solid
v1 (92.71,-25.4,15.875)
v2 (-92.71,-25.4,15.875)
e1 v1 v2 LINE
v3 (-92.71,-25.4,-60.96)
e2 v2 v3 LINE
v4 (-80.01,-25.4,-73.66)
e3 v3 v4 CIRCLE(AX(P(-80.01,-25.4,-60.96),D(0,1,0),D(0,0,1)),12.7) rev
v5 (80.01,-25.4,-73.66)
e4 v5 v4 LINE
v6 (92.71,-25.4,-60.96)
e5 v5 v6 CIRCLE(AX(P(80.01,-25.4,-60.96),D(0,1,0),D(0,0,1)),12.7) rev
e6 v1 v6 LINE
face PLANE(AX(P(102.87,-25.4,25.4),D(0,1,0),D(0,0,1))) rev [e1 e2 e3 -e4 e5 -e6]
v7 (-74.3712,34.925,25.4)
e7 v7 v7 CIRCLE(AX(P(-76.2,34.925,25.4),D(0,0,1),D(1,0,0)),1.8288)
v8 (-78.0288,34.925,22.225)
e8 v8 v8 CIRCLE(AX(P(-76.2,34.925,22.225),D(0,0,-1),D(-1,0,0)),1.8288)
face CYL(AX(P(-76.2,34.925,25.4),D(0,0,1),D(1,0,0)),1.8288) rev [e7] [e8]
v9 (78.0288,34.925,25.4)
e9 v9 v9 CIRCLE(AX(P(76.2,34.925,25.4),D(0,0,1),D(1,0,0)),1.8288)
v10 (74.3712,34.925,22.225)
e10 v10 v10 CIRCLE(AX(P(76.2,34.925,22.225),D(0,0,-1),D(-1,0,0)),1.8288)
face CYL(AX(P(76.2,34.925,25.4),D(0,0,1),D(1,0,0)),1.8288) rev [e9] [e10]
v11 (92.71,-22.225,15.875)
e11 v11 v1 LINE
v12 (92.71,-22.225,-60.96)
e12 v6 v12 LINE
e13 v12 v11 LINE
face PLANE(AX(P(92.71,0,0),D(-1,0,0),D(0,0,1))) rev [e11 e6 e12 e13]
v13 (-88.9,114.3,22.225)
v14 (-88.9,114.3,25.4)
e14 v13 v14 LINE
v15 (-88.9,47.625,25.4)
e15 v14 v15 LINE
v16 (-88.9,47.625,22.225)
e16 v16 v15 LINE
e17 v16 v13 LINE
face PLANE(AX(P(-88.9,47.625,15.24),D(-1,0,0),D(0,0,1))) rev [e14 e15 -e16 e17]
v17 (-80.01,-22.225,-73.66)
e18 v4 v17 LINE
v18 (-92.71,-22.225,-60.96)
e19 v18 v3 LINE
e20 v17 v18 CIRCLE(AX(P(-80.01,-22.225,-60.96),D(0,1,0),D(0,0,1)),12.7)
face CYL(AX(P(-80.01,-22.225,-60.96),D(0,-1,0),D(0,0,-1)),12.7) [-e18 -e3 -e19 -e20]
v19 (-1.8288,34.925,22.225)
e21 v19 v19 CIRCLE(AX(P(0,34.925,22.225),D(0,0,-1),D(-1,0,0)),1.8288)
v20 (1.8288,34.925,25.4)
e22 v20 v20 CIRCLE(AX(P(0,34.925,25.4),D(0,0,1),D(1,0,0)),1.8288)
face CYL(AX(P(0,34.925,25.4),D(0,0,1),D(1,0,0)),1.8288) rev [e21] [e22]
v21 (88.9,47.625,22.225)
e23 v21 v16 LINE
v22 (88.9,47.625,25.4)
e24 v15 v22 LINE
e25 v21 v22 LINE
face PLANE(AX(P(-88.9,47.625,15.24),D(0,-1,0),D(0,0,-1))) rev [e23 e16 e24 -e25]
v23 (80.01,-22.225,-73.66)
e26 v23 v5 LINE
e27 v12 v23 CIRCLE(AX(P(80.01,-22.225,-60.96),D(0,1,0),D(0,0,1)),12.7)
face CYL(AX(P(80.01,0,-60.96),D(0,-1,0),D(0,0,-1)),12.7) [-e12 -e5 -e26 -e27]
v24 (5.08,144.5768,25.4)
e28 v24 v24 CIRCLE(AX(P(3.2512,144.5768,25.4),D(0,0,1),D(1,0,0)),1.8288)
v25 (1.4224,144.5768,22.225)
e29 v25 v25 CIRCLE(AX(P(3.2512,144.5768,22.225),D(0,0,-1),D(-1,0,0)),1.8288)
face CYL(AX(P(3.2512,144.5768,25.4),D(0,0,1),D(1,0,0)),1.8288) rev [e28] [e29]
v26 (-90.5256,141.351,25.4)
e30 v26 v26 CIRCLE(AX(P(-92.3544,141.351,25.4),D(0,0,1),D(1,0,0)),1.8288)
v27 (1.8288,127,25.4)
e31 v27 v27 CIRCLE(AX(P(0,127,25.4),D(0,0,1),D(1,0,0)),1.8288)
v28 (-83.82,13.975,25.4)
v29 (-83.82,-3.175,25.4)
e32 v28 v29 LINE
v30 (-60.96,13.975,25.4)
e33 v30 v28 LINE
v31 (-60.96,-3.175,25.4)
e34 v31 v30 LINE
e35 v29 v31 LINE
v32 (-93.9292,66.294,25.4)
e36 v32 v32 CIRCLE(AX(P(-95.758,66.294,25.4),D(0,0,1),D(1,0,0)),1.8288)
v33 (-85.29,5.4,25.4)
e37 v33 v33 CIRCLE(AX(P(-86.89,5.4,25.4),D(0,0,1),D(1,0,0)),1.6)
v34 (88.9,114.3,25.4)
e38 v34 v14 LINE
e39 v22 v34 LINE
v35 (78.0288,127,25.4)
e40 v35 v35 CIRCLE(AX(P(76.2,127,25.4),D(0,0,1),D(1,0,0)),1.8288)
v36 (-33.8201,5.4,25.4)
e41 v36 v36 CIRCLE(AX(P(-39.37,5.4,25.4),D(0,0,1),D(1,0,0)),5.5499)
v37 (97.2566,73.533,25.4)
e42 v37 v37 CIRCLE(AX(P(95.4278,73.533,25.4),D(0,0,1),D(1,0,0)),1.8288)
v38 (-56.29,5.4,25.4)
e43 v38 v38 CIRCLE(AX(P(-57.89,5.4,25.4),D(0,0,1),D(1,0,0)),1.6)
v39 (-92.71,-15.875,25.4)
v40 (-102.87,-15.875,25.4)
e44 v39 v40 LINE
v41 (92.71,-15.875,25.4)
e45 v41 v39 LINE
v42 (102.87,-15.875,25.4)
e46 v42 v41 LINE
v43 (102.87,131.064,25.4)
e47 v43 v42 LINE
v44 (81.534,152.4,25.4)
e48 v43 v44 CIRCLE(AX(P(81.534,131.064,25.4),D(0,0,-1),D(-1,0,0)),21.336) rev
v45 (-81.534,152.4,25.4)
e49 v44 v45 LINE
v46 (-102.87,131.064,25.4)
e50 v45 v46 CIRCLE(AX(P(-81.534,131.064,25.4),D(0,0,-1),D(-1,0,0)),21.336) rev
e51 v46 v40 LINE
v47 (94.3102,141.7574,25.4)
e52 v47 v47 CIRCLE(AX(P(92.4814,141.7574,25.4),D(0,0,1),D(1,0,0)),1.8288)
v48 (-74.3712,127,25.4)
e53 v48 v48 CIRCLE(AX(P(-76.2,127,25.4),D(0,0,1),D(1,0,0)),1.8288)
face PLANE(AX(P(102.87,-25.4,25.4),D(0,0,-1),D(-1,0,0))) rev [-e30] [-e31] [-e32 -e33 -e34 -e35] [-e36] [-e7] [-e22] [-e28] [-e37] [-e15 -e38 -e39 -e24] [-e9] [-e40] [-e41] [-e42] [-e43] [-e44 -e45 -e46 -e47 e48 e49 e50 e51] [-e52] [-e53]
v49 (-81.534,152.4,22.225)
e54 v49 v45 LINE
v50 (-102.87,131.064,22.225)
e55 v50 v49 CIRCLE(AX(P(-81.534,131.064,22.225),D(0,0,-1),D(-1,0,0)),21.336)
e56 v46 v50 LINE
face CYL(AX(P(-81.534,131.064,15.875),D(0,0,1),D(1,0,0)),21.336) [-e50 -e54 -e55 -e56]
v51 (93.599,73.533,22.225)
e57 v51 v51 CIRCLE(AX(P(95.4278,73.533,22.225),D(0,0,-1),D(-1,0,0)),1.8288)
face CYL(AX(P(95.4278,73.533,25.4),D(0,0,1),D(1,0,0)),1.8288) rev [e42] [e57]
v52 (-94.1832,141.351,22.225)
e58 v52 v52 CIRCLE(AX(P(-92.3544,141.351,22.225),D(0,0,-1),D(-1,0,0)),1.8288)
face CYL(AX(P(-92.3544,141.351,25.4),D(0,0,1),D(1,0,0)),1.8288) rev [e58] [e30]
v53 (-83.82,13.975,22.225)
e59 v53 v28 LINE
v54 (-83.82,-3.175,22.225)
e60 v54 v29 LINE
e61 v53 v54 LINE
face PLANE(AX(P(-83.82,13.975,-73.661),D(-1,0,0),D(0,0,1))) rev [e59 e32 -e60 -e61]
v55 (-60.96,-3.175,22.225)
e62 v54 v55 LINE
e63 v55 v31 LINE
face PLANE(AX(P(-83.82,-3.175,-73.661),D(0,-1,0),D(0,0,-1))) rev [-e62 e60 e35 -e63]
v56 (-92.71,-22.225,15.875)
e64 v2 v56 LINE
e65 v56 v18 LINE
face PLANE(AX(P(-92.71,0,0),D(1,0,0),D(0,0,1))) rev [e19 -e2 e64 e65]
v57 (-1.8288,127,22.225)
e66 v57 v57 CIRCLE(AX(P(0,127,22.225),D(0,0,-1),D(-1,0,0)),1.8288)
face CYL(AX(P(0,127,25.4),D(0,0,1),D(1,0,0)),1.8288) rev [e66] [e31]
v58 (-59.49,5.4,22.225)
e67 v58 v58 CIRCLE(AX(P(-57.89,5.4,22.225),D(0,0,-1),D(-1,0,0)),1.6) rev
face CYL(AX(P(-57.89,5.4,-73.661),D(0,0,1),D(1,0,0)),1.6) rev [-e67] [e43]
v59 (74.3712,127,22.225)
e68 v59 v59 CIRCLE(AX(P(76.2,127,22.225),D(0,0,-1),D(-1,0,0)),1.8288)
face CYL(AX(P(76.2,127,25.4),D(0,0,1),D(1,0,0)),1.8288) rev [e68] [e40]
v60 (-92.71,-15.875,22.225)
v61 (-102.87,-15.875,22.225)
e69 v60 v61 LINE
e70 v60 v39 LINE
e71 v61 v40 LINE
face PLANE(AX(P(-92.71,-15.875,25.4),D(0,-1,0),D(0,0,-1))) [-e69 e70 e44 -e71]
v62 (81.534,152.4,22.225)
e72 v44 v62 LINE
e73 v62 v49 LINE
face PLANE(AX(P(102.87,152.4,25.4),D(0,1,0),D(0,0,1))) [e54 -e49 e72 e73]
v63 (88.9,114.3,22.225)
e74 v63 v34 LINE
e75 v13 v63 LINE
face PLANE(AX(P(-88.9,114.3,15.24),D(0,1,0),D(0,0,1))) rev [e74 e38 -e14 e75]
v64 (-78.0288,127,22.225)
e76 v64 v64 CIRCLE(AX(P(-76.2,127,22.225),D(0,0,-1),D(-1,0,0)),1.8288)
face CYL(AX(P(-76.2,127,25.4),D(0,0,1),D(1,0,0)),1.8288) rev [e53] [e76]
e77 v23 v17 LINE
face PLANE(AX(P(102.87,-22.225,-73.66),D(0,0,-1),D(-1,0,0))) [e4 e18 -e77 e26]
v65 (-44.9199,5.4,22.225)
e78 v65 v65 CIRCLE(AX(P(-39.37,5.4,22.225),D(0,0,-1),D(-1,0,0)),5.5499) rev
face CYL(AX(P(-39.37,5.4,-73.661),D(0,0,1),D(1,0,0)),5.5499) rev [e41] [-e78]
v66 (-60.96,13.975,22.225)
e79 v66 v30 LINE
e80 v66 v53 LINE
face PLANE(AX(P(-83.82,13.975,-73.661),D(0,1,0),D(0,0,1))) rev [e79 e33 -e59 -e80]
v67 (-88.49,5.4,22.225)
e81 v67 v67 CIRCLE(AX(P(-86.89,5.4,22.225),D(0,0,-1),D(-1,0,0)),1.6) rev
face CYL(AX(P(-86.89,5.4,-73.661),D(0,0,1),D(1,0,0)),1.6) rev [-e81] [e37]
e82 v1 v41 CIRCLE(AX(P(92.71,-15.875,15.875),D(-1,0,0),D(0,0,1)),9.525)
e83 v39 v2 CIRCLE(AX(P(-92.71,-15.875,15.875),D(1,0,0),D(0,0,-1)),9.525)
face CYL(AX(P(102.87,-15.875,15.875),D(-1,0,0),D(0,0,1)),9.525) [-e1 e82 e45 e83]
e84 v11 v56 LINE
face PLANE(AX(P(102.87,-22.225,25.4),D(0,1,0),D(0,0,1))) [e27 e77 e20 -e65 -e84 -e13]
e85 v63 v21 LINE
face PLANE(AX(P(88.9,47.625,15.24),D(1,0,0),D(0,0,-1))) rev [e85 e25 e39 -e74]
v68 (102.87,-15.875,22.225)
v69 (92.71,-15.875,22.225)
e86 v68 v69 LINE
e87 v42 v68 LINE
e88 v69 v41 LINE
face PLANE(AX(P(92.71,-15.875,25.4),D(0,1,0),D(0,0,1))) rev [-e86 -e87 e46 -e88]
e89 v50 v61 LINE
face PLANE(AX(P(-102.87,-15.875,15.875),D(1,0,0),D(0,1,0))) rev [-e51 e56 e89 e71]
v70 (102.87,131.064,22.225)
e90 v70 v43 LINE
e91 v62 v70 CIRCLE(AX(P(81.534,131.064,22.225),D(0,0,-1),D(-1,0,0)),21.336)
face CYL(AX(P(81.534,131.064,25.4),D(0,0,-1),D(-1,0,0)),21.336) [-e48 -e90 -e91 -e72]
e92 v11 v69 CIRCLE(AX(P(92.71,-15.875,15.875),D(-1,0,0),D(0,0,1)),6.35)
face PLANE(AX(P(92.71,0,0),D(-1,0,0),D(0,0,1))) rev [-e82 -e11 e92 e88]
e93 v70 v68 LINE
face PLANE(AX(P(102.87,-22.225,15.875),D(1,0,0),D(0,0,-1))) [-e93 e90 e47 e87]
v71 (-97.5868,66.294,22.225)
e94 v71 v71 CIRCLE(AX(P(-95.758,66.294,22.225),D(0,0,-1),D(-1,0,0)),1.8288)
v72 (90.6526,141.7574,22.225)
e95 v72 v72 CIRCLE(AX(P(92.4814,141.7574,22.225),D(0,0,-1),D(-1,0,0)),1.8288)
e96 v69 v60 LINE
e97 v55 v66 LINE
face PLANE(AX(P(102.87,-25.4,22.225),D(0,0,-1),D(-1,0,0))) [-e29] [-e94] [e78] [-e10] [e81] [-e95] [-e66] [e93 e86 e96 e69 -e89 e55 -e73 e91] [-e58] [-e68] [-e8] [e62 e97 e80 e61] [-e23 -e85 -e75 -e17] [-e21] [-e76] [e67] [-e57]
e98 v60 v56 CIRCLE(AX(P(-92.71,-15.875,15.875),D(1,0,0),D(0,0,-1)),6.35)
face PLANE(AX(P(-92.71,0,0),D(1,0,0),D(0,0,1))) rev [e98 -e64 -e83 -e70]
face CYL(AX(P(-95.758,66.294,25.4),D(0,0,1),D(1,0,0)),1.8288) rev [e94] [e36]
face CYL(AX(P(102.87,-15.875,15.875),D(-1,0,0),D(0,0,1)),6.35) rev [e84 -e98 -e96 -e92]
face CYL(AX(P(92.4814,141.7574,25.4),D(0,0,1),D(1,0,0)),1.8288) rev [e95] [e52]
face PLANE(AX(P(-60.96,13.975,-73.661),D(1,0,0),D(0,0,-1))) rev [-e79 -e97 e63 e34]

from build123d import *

# Parameters (mm, degrees)
BASE_FLANGE1_DEPTH          = 102.87
SKETCH6_W                   = 9.525
SKETCH6_H                   = 99.06
CUT_EXTRUDE1_DEPTH          = 10.16
FILLET1_R                   = 21.336
FILLET2_R                   = 12.7
SKETCH8_W                   = 177.8
SKETCH8_H                   = 66.675
CUT_EXTRUDE2_DEPTH          = 10.16
F_27_0_144_DIAMETER_HOLE1_D = 3.6576
F_27_0_144_DIAMETER_HOLE2_D = 3.6576
CUT_EXTRUDE3_REACH          = 210.856
SKETCH17_R                  = 1.6
SKETCH17_W                  = 22.86
SKETCH17_H                  = 17.15
CUT_EXTRUDE4_REACH          = 210.856
SKETCH18_R                  = 5.5499


# Sheet-metal steps are written as plain solids
with BuildPart() as part:
    # Sketch1 → Base-Flange1 (new, symmetric)
    with BuildSketch(Plane.YZ):
        with BuildLine():
            Line((-25.4, -73.66), (-25.4, 15.875))
            ThreePointArc((-25.4, 15.875), (-22.610192091, 22.610192091), (-15.875, 25.4))
            Line((-15.875, 25.4), (152.4, 25.4))
            Line((152.4, 25.4), (152.4, 22.225))
            Line((152.4, 22.225), (-15.875, 22.225))
            ThreePointArc((-15.875, 22.225), (-20.365128061, 20.365128061), (-22.225, 15.875))
            Line((-22.225, 15.875), (-22.225, -73.66))
            Line((-22.225, -73.66), (-25.4, -73.66))
        make_face()
    extrude(amount=BASE_FLANGE1_DEPTH, both=True)

    # Sketch6 → Cut-Extrude1 (cut)
    with BuildSketch(Plane.YZ.offset(102.87)):
        with Locations((-20.6375, -24.13)):
            Rectangle(SKETCH6_W, SKETCH6_H)
    cut_extrude1 = extrude(amount=-CUT_EXTRUDE1_DEPTH, mode=Mode.SUBTRACT)

    # Mirror1: Cut-Extrude1 across plane
    add(cut_extrude1.mirror(Plane(origin=(0, 0, 0), x_dir=(0, 0, 1), z_dir=(1, 0, 0))), mode=Mode.SUBTRACT)

    # Fillet1
    fillet1_edges = [part.edges().sort_by_distance(p)[0] for p in [
        (102.87, 152.4, 23.8125),
        (-102.87, 152.4, 23.8125),
    ]]
    fillet(fillet1_edges, radius=FILLET1_R)

    # Fillet2
    fillet2_edges = [part.edges().sort_by_distance(p)[0] for p in [
        (92.71, -23.8125, -73.66),
        (-92.71, -23.8125, -73.66),
    ]]
    fillet(fillet2_edges, radius=FILLET2_R)

    # Sketch8 → Cut-Extrude2 (cut)
    with BuildSketch(Plane.XY.offset(25.4)):
        with Locations((0, 80.9625)):
            Rectangle(SKETCH8_W, SKETCH8_H)
    extrude(amount=-CUT_EXTRUDE2_DEPTH, mode=Mode.SUBTRACT)

    # #27 (0.144) Diameter Hole1 (through all)
    with Locations(Plane.XY.offset(25.4)):
        with Locations((-76.2, 127), (0, 127), (76.2, 127), (76.2, 34.925), (0, 34.925), (-76.2, 34.925)):
            Hole(F_27_0_144_DIAMETER_HOLE1_D / 2)

    # #27 (0.144) Diameter Hole2 (through all)
    with Locations(Plane.XY.offset(25.4)):
        with Locations((92.4814, 141.7574), (95.4278, 73.533), (95.4278, -25.273), (-95.758, -18.034), (-95.758, 66.294), (-92.3544, 141.351), (3.2512, 144.5768)):
            Hole(F_27_0_144_DIAMETER_HOLE2_D / 2)

    # Sketch17 → Cut-Extrude3 (cut, up to next)
    with BuildSketch(Plane.XY.offset(25.4), mode=Mode.PRIVATE) as cut_extrude3_sk1:
        with Locations((-86.89, 5.4)):
            Circle(SKETCH17_R)
    cut_extrude3_tool1 = extrude(cut_extrude3_sk1.sketch, amount=-CUT_EXTRUDE3_REACH, mode=Mode.PRIVATE) & part.part
    # Sketch17 → Cut-Extrude3 (cut, up to next)
    with BuildSketch(Plane.XY.offset(25.4), mode=Mode.PRIVATE) as cut_extrude3_sk2:
        with Locations((-57.89, 5.4)):
            Circle(SKETCH17_R)
    cut_extrude3_tool2 = extrude(cut_extrude3_sk2.sketch, amount=-CUT_EXTRUDE3_REACH, mode=Mode.PRIVATE) & part.part
    # Sketch17 → Cut-Extrude3 (cut, up to next)
    with BuildSketch(Plane.XY.offset(25.4), mode=Mode.PRIVATE) as cut_extrude3_sk3:
        with Locations((-72.39, 5.4)):
            Rectangle(SKETCH17_W, SKETCH17_H)
    cut_extrude3_tool3 = extrude(cut_extrude3_sk3.sketch, amount=-CUT_EXTRUDE3_REACH, mode=Mode.PRIVATE) & part.part
    add(cut_extrude3_tool1.solids().sort_by_distance((-86.89, 5.4, 25.4))[0], mode=Mode.SUBTRACT)
    add(cut_extrude3_tool2.solids().sort_by_distance((-57.89, 5.4, 25.4))[0], mode=Mode.SUBTRACT)
    add(cut_extrude3_tool3.solids().sort_by_distance((-72.39, 5.4, 25.4))[0], mode=Mode.SUBTRACT)

    # Sketch18 → Cut-Extrude4 (cut, up to next)
    with BuildSketch(Plane.XY.offset(25.4), mode=Mode.PRIVATE) as cut_extrude4_sk1:
        with Locations((-39.37, 5.4)):
            Circle(SKETCH18_R)
    cut_extrude4_tool1 = extrude(cut_extrude4_sk1.sketch, amount=-CUT_EXTRUDE4_REACH, mode=Mode.PRIVATE) & part.part
    add(cut_extrude4_tool1.solids().sort_by_distance((-39.37, 5.4, 25.4))[0], mode=Mode.SUBTRACT)


solid = part.part
